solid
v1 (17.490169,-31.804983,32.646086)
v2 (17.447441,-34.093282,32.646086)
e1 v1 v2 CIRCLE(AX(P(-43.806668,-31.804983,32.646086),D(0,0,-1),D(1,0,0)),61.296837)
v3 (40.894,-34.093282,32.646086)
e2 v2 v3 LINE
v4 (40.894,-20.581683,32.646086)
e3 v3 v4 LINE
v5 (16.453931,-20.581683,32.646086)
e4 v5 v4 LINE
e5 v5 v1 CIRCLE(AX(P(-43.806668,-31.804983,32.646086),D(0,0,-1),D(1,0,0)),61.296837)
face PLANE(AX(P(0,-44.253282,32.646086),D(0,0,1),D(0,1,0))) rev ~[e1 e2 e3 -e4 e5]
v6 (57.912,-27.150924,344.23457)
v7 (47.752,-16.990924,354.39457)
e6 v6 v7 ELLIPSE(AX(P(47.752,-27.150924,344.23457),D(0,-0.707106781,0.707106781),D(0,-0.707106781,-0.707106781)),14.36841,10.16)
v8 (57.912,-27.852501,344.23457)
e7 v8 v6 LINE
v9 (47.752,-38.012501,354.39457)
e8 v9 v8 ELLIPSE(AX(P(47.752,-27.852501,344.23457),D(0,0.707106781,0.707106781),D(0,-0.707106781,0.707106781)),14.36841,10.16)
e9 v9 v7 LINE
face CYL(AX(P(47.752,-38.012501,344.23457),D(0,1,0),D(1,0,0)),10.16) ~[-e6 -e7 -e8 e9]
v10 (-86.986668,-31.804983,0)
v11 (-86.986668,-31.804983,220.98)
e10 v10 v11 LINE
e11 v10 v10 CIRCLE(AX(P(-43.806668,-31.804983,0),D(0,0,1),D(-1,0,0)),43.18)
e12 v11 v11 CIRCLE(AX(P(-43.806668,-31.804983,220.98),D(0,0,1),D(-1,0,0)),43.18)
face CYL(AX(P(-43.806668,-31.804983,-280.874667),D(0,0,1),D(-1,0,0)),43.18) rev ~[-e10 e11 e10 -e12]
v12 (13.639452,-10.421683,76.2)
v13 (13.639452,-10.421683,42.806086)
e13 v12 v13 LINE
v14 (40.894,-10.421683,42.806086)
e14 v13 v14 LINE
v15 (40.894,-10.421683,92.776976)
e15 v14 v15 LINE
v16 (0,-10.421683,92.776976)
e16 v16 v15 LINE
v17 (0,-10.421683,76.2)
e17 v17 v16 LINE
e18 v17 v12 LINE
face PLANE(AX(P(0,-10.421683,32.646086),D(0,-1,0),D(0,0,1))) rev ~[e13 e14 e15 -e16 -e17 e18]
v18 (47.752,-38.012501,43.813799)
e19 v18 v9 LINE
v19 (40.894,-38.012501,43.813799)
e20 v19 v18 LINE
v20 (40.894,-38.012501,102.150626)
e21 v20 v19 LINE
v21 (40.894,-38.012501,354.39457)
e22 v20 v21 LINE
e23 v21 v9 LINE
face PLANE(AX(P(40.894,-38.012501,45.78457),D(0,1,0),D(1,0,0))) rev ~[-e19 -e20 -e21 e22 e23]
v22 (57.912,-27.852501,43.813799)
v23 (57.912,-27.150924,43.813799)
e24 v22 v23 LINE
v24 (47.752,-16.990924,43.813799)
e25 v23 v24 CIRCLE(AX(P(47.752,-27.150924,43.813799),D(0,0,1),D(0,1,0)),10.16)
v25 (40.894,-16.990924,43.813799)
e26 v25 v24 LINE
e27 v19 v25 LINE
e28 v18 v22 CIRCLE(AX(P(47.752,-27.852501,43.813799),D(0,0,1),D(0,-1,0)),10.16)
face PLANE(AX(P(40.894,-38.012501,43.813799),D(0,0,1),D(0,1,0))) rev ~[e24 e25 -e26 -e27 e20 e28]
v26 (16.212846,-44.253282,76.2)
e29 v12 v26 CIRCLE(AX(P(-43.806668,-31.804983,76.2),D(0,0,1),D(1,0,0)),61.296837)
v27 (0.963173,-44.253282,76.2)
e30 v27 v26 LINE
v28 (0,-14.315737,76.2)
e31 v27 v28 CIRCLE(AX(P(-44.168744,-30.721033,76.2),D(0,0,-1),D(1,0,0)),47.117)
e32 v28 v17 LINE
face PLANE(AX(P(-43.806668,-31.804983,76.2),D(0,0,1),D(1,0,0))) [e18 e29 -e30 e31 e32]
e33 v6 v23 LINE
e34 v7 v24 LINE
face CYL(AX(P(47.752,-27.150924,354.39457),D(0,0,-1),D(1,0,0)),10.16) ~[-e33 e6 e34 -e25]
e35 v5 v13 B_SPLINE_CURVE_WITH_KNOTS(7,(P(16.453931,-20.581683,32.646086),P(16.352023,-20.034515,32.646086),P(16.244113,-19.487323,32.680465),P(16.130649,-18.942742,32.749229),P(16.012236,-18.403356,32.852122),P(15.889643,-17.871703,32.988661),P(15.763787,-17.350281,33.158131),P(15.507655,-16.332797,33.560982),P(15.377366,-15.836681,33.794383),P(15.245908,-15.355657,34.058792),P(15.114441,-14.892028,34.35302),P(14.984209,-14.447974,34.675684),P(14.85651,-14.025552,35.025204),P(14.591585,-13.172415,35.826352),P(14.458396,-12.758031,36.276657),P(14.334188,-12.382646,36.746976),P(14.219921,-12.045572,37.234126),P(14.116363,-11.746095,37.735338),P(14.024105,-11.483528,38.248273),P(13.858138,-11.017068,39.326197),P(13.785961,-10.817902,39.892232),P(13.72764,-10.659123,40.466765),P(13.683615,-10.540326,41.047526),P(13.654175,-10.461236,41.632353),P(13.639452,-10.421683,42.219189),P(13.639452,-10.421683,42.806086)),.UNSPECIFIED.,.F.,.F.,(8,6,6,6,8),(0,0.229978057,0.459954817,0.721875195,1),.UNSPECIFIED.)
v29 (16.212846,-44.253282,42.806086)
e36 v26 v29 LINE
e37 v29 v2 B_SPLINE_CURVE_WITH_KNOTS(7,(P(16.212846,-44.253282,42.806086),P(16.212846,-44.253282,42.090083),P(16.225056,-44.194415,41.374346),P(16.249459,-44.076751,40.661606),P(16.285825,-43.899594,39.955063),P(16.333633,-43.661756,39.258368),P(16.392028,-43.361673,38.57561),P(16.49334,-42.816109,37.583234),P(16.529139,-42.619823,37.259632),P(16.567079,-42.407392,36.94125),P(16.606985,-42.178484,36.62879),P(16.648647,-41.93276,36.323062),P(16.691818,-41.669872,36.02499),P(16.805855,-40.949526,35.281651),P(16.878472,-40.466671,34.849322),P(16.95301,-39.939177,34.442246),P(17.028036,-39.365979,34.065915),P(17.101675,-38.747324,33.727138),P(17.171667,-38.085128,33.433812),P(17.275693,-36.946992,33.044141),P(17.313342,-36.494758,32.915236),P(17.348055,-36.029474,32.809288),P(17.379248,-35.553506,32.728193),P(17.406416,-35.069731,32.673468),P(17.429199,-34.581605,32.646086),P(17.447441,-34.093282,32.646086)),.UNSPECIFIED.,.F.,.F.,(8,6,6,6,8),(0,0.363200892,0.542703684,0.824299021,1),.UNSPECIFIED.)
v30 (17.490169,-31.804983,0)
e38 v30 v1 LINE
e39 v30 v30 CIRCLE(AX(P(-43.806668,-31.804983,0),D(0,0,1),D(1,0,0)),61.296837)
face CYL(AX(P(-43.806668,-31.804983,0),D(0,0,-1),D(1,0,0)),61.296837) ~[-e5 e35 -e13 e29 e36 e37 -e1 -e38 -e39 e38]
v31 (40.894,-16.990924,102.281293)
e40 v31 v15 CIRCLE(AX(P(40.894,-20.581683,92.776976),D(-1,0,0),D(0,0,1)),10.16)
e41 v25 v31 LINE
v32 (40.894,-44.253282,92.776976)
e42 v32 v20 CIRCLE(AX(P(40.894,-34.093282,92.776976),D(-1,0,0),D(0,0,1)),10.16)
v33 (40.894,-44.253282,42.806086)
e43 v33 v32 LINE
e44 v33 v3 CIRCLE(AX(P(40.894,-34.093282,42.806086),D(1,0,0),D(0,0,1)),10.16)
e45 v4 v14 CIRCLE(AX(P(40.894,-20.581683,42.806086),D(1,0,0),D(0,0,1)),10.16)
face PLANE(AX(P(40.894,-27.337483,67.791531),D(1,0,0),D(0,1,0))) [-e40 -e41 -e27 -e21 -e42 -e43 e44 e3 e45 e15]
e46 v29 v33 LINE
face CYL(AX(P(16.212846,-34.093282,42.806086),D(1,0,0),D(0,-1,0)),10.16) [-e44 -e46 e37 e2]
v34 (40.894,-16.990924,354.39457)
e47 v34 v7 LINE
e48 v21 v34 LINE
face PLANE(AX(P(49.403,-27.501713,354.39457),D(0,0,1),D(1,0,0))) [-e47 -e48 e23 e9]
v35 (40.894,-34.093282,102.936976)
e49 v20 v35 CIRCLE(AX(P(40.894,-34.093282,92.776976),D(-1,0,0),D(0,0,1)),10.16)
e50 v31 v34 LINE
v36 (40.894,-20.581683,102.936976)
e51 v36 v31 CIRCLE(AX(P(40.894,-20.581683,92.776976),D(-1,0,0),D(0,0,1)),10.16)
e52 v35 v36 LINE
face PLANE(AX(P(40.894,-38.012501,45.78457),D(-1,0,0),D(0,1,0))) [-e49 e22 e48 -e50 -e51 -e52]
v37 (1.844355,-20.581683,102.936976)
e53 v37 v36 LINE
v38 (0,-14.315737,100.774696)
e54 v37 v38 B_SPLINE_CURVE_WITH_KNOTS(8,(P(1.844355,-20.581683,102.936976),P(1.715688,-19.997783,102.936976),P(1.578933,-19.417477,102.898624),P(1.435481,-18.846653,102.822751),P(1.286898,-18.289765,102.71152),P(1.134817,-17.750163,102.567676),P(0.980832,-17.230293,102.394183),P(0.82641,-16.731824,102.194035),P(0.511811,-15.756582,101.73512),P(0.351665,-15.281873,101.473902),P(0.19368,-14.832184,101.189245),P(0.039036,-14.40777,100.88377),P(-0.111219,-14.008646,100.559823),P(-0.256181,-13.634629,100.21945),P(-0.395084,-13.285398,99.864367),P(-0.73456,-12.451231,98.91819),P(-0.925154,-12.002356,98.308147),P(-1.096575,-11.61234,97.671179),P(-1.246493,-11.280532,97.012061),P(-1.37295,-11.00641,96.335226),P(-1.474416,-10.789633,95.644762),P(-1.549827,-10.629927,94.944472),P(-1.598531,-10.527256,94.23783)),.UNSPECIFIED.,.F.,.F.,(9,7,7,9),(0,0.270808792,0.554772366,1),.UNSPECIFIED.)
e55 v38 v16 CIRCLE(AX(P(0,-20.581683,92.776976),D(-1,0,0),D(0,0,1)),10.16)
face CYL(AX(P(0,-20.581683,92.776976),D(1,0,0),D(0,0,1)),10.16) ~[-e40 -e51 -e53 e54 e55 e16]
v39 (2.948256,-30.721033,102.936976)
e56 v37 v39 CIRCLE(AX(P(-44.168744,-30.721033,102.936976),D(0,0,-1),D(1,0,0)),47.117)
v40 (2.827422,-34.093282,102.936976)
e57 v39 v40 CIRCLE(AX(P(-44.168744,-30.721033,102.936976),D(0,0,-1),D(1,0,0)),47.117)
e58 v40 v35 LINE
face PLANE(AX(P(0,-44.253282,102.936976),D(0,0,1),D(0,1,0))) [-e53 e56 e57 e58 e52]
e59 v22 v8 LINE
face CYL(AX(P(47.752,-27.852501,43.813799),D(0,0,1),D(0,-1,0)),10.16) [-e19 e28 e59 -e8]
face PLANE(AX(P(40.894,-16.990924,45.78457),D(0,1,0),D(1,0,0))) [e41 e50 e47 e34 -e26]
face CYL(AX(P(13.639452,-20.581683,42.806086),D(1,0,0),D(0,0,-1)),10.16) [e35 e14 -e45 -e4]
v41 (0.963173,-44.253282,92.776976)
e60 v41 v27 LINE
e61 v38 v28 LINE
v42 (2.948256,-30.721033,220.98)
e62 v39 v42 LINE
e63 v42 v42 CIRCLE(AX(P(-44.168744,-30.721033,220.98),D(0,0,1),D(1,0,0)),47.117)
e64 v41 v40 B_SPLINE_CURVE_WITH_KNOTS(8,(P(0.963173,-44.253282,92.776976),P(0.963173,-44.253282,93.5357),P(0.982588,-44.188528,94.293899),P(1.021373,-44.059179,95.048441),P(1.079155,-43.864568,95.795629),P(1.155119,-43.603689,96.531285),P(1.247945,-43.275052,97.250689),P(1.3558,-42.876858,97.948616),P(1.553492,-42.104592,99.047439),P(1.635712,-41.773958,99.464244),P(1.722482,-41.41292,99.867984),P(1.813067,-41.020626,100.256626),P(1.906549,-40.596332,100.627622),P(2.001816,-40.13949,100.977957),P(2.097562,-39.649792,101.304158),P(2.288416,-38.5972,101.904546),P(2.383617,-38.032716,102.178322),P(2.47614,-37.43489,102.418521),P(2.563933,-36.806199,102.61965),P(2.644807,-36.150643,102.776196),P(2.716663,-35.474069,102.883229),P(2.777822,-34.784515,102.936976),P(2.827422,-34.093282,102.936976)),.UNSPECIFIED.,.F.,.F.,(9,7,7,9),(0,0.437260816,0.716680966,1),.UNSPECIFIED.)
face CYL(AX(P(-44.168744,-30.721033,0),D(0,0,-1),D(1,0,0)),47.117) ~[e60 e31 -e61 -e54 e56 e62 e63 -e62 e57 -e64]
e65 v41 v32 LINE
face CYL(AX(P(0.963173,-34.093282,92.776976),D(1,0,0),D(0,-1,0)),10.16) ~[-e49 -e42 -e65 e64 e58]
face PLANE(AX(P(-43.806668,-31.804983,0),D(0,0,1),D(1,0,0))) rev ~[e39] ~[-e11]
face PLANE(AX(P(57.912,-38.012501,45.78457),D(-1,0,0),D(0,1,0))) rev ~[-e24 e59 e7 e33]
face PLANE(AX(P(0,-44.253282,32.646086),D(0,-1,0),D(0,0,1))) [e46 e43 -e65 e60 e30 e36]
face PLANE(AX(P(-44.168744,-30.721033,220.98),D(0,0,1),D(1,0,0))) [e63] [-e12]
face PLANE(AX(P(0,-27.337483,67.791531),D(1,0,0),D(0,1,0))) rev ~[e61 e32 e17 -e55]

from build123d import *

# Parameters (mm, degrees)
F0_R      = 47.117
F1_DEPTH  = 220.98
F3_D      = 78.74
F4_R      = 61.2968374211
F5_DEPTH  = 76.2
F7_D      = 86.36
F8_W      = 33.8315991685
F8_H      = 70.290889591
F9_DEPTH  = 40.894
F10_R     = 10.16
F11_W     = 21.0215765983
F11_H     = 1.9707717001
F12_DEPTH = 17.018
F13_W     = 17.018
F13_H     = 21.0215765983
F14_DEPTH = 308.61
F15_R     = 10.16


with BuildPart() as f1:
    # F0 (on Top) → F1 (new body)
    with BuildSketch(Plane.XY):
        with Locations((-44.1687442362, -30.721032992)):
            Circle(F0_R)
    extrude(amount=F1_DEPTH)

    # F3 (through all)
    with Locations(Plane(origin=(0, 0, 0), x_dir=(1, 0, 0), z_dir=(0, 0, -1))):
        with Locations((-44.1687442362, 30.721032992)):
            Hole(F3_D / 2)

    # F4 (on Top) → F5 (join)
    with BuildSketch(Plane.XY):
        with Locations((-43.806668371, -31.8049825728)):
            Circle(F4_R)
    extrude(amount=F5_DEPTH)

    # F7 (through all)
    with Locations(Plane(origin=(0, 0, 0), x_dir=(1, 0, 0), z_dir=(0, 0, -1))):
        with Locations((-43.806668371, 31.8049825728)):
            Hole(F7_D / 2)

    # F8 (on Right) → F9 (join)
    with BuildSketch(Plane.YZ):
        with Locations((-27.3374826647, 67.7915308625)):
            Rectangle(F8_W, F8_H)
    extrude(amount=F9_DEPTH)

    # F10
    f10_edges = [f1.edges().sort_by_distance(p)[0] for p in [
        (20.447, -10.421683, 102.936976),
        (20.928586, -44.253282, 102.936976),
        (27.266726, -10.421683, 32.646086),
        (28.553423, -44.253282, 32.646086),
    ]]
    fillet(f10_edges, radius=F10_R)

    # F11 (on face) → F12 (join)
    with BuildSketch(Plane.YZ.offset(40.894)):
        with Locations((-27.5017125532, 44.7991844267)):
            Rectangle(F11_W, F11_H)
    extrude(amount=F12_DEPTH)

    # F13 (on face) → F14 (join)
    with BuildSketch(Plane.XY.offset(45.7845702767)):
        with Locations((49.403, -27.5017125532)):
            Rectangle(F13_W, F13_H)
    extrude(amount=F14_DEPTH)

    # F15
    f15_edges = [f1.edges().sort_by_distance(p)[0] for p in [
        (57.912, -38.012501, 199.104184),
        (57.912, -16.990924, 199.104184),
        (57.912, -27.501713, 354.39457),
    ]]
    fillet(f15_edges, radius=F15_R)


solid = f1.part
